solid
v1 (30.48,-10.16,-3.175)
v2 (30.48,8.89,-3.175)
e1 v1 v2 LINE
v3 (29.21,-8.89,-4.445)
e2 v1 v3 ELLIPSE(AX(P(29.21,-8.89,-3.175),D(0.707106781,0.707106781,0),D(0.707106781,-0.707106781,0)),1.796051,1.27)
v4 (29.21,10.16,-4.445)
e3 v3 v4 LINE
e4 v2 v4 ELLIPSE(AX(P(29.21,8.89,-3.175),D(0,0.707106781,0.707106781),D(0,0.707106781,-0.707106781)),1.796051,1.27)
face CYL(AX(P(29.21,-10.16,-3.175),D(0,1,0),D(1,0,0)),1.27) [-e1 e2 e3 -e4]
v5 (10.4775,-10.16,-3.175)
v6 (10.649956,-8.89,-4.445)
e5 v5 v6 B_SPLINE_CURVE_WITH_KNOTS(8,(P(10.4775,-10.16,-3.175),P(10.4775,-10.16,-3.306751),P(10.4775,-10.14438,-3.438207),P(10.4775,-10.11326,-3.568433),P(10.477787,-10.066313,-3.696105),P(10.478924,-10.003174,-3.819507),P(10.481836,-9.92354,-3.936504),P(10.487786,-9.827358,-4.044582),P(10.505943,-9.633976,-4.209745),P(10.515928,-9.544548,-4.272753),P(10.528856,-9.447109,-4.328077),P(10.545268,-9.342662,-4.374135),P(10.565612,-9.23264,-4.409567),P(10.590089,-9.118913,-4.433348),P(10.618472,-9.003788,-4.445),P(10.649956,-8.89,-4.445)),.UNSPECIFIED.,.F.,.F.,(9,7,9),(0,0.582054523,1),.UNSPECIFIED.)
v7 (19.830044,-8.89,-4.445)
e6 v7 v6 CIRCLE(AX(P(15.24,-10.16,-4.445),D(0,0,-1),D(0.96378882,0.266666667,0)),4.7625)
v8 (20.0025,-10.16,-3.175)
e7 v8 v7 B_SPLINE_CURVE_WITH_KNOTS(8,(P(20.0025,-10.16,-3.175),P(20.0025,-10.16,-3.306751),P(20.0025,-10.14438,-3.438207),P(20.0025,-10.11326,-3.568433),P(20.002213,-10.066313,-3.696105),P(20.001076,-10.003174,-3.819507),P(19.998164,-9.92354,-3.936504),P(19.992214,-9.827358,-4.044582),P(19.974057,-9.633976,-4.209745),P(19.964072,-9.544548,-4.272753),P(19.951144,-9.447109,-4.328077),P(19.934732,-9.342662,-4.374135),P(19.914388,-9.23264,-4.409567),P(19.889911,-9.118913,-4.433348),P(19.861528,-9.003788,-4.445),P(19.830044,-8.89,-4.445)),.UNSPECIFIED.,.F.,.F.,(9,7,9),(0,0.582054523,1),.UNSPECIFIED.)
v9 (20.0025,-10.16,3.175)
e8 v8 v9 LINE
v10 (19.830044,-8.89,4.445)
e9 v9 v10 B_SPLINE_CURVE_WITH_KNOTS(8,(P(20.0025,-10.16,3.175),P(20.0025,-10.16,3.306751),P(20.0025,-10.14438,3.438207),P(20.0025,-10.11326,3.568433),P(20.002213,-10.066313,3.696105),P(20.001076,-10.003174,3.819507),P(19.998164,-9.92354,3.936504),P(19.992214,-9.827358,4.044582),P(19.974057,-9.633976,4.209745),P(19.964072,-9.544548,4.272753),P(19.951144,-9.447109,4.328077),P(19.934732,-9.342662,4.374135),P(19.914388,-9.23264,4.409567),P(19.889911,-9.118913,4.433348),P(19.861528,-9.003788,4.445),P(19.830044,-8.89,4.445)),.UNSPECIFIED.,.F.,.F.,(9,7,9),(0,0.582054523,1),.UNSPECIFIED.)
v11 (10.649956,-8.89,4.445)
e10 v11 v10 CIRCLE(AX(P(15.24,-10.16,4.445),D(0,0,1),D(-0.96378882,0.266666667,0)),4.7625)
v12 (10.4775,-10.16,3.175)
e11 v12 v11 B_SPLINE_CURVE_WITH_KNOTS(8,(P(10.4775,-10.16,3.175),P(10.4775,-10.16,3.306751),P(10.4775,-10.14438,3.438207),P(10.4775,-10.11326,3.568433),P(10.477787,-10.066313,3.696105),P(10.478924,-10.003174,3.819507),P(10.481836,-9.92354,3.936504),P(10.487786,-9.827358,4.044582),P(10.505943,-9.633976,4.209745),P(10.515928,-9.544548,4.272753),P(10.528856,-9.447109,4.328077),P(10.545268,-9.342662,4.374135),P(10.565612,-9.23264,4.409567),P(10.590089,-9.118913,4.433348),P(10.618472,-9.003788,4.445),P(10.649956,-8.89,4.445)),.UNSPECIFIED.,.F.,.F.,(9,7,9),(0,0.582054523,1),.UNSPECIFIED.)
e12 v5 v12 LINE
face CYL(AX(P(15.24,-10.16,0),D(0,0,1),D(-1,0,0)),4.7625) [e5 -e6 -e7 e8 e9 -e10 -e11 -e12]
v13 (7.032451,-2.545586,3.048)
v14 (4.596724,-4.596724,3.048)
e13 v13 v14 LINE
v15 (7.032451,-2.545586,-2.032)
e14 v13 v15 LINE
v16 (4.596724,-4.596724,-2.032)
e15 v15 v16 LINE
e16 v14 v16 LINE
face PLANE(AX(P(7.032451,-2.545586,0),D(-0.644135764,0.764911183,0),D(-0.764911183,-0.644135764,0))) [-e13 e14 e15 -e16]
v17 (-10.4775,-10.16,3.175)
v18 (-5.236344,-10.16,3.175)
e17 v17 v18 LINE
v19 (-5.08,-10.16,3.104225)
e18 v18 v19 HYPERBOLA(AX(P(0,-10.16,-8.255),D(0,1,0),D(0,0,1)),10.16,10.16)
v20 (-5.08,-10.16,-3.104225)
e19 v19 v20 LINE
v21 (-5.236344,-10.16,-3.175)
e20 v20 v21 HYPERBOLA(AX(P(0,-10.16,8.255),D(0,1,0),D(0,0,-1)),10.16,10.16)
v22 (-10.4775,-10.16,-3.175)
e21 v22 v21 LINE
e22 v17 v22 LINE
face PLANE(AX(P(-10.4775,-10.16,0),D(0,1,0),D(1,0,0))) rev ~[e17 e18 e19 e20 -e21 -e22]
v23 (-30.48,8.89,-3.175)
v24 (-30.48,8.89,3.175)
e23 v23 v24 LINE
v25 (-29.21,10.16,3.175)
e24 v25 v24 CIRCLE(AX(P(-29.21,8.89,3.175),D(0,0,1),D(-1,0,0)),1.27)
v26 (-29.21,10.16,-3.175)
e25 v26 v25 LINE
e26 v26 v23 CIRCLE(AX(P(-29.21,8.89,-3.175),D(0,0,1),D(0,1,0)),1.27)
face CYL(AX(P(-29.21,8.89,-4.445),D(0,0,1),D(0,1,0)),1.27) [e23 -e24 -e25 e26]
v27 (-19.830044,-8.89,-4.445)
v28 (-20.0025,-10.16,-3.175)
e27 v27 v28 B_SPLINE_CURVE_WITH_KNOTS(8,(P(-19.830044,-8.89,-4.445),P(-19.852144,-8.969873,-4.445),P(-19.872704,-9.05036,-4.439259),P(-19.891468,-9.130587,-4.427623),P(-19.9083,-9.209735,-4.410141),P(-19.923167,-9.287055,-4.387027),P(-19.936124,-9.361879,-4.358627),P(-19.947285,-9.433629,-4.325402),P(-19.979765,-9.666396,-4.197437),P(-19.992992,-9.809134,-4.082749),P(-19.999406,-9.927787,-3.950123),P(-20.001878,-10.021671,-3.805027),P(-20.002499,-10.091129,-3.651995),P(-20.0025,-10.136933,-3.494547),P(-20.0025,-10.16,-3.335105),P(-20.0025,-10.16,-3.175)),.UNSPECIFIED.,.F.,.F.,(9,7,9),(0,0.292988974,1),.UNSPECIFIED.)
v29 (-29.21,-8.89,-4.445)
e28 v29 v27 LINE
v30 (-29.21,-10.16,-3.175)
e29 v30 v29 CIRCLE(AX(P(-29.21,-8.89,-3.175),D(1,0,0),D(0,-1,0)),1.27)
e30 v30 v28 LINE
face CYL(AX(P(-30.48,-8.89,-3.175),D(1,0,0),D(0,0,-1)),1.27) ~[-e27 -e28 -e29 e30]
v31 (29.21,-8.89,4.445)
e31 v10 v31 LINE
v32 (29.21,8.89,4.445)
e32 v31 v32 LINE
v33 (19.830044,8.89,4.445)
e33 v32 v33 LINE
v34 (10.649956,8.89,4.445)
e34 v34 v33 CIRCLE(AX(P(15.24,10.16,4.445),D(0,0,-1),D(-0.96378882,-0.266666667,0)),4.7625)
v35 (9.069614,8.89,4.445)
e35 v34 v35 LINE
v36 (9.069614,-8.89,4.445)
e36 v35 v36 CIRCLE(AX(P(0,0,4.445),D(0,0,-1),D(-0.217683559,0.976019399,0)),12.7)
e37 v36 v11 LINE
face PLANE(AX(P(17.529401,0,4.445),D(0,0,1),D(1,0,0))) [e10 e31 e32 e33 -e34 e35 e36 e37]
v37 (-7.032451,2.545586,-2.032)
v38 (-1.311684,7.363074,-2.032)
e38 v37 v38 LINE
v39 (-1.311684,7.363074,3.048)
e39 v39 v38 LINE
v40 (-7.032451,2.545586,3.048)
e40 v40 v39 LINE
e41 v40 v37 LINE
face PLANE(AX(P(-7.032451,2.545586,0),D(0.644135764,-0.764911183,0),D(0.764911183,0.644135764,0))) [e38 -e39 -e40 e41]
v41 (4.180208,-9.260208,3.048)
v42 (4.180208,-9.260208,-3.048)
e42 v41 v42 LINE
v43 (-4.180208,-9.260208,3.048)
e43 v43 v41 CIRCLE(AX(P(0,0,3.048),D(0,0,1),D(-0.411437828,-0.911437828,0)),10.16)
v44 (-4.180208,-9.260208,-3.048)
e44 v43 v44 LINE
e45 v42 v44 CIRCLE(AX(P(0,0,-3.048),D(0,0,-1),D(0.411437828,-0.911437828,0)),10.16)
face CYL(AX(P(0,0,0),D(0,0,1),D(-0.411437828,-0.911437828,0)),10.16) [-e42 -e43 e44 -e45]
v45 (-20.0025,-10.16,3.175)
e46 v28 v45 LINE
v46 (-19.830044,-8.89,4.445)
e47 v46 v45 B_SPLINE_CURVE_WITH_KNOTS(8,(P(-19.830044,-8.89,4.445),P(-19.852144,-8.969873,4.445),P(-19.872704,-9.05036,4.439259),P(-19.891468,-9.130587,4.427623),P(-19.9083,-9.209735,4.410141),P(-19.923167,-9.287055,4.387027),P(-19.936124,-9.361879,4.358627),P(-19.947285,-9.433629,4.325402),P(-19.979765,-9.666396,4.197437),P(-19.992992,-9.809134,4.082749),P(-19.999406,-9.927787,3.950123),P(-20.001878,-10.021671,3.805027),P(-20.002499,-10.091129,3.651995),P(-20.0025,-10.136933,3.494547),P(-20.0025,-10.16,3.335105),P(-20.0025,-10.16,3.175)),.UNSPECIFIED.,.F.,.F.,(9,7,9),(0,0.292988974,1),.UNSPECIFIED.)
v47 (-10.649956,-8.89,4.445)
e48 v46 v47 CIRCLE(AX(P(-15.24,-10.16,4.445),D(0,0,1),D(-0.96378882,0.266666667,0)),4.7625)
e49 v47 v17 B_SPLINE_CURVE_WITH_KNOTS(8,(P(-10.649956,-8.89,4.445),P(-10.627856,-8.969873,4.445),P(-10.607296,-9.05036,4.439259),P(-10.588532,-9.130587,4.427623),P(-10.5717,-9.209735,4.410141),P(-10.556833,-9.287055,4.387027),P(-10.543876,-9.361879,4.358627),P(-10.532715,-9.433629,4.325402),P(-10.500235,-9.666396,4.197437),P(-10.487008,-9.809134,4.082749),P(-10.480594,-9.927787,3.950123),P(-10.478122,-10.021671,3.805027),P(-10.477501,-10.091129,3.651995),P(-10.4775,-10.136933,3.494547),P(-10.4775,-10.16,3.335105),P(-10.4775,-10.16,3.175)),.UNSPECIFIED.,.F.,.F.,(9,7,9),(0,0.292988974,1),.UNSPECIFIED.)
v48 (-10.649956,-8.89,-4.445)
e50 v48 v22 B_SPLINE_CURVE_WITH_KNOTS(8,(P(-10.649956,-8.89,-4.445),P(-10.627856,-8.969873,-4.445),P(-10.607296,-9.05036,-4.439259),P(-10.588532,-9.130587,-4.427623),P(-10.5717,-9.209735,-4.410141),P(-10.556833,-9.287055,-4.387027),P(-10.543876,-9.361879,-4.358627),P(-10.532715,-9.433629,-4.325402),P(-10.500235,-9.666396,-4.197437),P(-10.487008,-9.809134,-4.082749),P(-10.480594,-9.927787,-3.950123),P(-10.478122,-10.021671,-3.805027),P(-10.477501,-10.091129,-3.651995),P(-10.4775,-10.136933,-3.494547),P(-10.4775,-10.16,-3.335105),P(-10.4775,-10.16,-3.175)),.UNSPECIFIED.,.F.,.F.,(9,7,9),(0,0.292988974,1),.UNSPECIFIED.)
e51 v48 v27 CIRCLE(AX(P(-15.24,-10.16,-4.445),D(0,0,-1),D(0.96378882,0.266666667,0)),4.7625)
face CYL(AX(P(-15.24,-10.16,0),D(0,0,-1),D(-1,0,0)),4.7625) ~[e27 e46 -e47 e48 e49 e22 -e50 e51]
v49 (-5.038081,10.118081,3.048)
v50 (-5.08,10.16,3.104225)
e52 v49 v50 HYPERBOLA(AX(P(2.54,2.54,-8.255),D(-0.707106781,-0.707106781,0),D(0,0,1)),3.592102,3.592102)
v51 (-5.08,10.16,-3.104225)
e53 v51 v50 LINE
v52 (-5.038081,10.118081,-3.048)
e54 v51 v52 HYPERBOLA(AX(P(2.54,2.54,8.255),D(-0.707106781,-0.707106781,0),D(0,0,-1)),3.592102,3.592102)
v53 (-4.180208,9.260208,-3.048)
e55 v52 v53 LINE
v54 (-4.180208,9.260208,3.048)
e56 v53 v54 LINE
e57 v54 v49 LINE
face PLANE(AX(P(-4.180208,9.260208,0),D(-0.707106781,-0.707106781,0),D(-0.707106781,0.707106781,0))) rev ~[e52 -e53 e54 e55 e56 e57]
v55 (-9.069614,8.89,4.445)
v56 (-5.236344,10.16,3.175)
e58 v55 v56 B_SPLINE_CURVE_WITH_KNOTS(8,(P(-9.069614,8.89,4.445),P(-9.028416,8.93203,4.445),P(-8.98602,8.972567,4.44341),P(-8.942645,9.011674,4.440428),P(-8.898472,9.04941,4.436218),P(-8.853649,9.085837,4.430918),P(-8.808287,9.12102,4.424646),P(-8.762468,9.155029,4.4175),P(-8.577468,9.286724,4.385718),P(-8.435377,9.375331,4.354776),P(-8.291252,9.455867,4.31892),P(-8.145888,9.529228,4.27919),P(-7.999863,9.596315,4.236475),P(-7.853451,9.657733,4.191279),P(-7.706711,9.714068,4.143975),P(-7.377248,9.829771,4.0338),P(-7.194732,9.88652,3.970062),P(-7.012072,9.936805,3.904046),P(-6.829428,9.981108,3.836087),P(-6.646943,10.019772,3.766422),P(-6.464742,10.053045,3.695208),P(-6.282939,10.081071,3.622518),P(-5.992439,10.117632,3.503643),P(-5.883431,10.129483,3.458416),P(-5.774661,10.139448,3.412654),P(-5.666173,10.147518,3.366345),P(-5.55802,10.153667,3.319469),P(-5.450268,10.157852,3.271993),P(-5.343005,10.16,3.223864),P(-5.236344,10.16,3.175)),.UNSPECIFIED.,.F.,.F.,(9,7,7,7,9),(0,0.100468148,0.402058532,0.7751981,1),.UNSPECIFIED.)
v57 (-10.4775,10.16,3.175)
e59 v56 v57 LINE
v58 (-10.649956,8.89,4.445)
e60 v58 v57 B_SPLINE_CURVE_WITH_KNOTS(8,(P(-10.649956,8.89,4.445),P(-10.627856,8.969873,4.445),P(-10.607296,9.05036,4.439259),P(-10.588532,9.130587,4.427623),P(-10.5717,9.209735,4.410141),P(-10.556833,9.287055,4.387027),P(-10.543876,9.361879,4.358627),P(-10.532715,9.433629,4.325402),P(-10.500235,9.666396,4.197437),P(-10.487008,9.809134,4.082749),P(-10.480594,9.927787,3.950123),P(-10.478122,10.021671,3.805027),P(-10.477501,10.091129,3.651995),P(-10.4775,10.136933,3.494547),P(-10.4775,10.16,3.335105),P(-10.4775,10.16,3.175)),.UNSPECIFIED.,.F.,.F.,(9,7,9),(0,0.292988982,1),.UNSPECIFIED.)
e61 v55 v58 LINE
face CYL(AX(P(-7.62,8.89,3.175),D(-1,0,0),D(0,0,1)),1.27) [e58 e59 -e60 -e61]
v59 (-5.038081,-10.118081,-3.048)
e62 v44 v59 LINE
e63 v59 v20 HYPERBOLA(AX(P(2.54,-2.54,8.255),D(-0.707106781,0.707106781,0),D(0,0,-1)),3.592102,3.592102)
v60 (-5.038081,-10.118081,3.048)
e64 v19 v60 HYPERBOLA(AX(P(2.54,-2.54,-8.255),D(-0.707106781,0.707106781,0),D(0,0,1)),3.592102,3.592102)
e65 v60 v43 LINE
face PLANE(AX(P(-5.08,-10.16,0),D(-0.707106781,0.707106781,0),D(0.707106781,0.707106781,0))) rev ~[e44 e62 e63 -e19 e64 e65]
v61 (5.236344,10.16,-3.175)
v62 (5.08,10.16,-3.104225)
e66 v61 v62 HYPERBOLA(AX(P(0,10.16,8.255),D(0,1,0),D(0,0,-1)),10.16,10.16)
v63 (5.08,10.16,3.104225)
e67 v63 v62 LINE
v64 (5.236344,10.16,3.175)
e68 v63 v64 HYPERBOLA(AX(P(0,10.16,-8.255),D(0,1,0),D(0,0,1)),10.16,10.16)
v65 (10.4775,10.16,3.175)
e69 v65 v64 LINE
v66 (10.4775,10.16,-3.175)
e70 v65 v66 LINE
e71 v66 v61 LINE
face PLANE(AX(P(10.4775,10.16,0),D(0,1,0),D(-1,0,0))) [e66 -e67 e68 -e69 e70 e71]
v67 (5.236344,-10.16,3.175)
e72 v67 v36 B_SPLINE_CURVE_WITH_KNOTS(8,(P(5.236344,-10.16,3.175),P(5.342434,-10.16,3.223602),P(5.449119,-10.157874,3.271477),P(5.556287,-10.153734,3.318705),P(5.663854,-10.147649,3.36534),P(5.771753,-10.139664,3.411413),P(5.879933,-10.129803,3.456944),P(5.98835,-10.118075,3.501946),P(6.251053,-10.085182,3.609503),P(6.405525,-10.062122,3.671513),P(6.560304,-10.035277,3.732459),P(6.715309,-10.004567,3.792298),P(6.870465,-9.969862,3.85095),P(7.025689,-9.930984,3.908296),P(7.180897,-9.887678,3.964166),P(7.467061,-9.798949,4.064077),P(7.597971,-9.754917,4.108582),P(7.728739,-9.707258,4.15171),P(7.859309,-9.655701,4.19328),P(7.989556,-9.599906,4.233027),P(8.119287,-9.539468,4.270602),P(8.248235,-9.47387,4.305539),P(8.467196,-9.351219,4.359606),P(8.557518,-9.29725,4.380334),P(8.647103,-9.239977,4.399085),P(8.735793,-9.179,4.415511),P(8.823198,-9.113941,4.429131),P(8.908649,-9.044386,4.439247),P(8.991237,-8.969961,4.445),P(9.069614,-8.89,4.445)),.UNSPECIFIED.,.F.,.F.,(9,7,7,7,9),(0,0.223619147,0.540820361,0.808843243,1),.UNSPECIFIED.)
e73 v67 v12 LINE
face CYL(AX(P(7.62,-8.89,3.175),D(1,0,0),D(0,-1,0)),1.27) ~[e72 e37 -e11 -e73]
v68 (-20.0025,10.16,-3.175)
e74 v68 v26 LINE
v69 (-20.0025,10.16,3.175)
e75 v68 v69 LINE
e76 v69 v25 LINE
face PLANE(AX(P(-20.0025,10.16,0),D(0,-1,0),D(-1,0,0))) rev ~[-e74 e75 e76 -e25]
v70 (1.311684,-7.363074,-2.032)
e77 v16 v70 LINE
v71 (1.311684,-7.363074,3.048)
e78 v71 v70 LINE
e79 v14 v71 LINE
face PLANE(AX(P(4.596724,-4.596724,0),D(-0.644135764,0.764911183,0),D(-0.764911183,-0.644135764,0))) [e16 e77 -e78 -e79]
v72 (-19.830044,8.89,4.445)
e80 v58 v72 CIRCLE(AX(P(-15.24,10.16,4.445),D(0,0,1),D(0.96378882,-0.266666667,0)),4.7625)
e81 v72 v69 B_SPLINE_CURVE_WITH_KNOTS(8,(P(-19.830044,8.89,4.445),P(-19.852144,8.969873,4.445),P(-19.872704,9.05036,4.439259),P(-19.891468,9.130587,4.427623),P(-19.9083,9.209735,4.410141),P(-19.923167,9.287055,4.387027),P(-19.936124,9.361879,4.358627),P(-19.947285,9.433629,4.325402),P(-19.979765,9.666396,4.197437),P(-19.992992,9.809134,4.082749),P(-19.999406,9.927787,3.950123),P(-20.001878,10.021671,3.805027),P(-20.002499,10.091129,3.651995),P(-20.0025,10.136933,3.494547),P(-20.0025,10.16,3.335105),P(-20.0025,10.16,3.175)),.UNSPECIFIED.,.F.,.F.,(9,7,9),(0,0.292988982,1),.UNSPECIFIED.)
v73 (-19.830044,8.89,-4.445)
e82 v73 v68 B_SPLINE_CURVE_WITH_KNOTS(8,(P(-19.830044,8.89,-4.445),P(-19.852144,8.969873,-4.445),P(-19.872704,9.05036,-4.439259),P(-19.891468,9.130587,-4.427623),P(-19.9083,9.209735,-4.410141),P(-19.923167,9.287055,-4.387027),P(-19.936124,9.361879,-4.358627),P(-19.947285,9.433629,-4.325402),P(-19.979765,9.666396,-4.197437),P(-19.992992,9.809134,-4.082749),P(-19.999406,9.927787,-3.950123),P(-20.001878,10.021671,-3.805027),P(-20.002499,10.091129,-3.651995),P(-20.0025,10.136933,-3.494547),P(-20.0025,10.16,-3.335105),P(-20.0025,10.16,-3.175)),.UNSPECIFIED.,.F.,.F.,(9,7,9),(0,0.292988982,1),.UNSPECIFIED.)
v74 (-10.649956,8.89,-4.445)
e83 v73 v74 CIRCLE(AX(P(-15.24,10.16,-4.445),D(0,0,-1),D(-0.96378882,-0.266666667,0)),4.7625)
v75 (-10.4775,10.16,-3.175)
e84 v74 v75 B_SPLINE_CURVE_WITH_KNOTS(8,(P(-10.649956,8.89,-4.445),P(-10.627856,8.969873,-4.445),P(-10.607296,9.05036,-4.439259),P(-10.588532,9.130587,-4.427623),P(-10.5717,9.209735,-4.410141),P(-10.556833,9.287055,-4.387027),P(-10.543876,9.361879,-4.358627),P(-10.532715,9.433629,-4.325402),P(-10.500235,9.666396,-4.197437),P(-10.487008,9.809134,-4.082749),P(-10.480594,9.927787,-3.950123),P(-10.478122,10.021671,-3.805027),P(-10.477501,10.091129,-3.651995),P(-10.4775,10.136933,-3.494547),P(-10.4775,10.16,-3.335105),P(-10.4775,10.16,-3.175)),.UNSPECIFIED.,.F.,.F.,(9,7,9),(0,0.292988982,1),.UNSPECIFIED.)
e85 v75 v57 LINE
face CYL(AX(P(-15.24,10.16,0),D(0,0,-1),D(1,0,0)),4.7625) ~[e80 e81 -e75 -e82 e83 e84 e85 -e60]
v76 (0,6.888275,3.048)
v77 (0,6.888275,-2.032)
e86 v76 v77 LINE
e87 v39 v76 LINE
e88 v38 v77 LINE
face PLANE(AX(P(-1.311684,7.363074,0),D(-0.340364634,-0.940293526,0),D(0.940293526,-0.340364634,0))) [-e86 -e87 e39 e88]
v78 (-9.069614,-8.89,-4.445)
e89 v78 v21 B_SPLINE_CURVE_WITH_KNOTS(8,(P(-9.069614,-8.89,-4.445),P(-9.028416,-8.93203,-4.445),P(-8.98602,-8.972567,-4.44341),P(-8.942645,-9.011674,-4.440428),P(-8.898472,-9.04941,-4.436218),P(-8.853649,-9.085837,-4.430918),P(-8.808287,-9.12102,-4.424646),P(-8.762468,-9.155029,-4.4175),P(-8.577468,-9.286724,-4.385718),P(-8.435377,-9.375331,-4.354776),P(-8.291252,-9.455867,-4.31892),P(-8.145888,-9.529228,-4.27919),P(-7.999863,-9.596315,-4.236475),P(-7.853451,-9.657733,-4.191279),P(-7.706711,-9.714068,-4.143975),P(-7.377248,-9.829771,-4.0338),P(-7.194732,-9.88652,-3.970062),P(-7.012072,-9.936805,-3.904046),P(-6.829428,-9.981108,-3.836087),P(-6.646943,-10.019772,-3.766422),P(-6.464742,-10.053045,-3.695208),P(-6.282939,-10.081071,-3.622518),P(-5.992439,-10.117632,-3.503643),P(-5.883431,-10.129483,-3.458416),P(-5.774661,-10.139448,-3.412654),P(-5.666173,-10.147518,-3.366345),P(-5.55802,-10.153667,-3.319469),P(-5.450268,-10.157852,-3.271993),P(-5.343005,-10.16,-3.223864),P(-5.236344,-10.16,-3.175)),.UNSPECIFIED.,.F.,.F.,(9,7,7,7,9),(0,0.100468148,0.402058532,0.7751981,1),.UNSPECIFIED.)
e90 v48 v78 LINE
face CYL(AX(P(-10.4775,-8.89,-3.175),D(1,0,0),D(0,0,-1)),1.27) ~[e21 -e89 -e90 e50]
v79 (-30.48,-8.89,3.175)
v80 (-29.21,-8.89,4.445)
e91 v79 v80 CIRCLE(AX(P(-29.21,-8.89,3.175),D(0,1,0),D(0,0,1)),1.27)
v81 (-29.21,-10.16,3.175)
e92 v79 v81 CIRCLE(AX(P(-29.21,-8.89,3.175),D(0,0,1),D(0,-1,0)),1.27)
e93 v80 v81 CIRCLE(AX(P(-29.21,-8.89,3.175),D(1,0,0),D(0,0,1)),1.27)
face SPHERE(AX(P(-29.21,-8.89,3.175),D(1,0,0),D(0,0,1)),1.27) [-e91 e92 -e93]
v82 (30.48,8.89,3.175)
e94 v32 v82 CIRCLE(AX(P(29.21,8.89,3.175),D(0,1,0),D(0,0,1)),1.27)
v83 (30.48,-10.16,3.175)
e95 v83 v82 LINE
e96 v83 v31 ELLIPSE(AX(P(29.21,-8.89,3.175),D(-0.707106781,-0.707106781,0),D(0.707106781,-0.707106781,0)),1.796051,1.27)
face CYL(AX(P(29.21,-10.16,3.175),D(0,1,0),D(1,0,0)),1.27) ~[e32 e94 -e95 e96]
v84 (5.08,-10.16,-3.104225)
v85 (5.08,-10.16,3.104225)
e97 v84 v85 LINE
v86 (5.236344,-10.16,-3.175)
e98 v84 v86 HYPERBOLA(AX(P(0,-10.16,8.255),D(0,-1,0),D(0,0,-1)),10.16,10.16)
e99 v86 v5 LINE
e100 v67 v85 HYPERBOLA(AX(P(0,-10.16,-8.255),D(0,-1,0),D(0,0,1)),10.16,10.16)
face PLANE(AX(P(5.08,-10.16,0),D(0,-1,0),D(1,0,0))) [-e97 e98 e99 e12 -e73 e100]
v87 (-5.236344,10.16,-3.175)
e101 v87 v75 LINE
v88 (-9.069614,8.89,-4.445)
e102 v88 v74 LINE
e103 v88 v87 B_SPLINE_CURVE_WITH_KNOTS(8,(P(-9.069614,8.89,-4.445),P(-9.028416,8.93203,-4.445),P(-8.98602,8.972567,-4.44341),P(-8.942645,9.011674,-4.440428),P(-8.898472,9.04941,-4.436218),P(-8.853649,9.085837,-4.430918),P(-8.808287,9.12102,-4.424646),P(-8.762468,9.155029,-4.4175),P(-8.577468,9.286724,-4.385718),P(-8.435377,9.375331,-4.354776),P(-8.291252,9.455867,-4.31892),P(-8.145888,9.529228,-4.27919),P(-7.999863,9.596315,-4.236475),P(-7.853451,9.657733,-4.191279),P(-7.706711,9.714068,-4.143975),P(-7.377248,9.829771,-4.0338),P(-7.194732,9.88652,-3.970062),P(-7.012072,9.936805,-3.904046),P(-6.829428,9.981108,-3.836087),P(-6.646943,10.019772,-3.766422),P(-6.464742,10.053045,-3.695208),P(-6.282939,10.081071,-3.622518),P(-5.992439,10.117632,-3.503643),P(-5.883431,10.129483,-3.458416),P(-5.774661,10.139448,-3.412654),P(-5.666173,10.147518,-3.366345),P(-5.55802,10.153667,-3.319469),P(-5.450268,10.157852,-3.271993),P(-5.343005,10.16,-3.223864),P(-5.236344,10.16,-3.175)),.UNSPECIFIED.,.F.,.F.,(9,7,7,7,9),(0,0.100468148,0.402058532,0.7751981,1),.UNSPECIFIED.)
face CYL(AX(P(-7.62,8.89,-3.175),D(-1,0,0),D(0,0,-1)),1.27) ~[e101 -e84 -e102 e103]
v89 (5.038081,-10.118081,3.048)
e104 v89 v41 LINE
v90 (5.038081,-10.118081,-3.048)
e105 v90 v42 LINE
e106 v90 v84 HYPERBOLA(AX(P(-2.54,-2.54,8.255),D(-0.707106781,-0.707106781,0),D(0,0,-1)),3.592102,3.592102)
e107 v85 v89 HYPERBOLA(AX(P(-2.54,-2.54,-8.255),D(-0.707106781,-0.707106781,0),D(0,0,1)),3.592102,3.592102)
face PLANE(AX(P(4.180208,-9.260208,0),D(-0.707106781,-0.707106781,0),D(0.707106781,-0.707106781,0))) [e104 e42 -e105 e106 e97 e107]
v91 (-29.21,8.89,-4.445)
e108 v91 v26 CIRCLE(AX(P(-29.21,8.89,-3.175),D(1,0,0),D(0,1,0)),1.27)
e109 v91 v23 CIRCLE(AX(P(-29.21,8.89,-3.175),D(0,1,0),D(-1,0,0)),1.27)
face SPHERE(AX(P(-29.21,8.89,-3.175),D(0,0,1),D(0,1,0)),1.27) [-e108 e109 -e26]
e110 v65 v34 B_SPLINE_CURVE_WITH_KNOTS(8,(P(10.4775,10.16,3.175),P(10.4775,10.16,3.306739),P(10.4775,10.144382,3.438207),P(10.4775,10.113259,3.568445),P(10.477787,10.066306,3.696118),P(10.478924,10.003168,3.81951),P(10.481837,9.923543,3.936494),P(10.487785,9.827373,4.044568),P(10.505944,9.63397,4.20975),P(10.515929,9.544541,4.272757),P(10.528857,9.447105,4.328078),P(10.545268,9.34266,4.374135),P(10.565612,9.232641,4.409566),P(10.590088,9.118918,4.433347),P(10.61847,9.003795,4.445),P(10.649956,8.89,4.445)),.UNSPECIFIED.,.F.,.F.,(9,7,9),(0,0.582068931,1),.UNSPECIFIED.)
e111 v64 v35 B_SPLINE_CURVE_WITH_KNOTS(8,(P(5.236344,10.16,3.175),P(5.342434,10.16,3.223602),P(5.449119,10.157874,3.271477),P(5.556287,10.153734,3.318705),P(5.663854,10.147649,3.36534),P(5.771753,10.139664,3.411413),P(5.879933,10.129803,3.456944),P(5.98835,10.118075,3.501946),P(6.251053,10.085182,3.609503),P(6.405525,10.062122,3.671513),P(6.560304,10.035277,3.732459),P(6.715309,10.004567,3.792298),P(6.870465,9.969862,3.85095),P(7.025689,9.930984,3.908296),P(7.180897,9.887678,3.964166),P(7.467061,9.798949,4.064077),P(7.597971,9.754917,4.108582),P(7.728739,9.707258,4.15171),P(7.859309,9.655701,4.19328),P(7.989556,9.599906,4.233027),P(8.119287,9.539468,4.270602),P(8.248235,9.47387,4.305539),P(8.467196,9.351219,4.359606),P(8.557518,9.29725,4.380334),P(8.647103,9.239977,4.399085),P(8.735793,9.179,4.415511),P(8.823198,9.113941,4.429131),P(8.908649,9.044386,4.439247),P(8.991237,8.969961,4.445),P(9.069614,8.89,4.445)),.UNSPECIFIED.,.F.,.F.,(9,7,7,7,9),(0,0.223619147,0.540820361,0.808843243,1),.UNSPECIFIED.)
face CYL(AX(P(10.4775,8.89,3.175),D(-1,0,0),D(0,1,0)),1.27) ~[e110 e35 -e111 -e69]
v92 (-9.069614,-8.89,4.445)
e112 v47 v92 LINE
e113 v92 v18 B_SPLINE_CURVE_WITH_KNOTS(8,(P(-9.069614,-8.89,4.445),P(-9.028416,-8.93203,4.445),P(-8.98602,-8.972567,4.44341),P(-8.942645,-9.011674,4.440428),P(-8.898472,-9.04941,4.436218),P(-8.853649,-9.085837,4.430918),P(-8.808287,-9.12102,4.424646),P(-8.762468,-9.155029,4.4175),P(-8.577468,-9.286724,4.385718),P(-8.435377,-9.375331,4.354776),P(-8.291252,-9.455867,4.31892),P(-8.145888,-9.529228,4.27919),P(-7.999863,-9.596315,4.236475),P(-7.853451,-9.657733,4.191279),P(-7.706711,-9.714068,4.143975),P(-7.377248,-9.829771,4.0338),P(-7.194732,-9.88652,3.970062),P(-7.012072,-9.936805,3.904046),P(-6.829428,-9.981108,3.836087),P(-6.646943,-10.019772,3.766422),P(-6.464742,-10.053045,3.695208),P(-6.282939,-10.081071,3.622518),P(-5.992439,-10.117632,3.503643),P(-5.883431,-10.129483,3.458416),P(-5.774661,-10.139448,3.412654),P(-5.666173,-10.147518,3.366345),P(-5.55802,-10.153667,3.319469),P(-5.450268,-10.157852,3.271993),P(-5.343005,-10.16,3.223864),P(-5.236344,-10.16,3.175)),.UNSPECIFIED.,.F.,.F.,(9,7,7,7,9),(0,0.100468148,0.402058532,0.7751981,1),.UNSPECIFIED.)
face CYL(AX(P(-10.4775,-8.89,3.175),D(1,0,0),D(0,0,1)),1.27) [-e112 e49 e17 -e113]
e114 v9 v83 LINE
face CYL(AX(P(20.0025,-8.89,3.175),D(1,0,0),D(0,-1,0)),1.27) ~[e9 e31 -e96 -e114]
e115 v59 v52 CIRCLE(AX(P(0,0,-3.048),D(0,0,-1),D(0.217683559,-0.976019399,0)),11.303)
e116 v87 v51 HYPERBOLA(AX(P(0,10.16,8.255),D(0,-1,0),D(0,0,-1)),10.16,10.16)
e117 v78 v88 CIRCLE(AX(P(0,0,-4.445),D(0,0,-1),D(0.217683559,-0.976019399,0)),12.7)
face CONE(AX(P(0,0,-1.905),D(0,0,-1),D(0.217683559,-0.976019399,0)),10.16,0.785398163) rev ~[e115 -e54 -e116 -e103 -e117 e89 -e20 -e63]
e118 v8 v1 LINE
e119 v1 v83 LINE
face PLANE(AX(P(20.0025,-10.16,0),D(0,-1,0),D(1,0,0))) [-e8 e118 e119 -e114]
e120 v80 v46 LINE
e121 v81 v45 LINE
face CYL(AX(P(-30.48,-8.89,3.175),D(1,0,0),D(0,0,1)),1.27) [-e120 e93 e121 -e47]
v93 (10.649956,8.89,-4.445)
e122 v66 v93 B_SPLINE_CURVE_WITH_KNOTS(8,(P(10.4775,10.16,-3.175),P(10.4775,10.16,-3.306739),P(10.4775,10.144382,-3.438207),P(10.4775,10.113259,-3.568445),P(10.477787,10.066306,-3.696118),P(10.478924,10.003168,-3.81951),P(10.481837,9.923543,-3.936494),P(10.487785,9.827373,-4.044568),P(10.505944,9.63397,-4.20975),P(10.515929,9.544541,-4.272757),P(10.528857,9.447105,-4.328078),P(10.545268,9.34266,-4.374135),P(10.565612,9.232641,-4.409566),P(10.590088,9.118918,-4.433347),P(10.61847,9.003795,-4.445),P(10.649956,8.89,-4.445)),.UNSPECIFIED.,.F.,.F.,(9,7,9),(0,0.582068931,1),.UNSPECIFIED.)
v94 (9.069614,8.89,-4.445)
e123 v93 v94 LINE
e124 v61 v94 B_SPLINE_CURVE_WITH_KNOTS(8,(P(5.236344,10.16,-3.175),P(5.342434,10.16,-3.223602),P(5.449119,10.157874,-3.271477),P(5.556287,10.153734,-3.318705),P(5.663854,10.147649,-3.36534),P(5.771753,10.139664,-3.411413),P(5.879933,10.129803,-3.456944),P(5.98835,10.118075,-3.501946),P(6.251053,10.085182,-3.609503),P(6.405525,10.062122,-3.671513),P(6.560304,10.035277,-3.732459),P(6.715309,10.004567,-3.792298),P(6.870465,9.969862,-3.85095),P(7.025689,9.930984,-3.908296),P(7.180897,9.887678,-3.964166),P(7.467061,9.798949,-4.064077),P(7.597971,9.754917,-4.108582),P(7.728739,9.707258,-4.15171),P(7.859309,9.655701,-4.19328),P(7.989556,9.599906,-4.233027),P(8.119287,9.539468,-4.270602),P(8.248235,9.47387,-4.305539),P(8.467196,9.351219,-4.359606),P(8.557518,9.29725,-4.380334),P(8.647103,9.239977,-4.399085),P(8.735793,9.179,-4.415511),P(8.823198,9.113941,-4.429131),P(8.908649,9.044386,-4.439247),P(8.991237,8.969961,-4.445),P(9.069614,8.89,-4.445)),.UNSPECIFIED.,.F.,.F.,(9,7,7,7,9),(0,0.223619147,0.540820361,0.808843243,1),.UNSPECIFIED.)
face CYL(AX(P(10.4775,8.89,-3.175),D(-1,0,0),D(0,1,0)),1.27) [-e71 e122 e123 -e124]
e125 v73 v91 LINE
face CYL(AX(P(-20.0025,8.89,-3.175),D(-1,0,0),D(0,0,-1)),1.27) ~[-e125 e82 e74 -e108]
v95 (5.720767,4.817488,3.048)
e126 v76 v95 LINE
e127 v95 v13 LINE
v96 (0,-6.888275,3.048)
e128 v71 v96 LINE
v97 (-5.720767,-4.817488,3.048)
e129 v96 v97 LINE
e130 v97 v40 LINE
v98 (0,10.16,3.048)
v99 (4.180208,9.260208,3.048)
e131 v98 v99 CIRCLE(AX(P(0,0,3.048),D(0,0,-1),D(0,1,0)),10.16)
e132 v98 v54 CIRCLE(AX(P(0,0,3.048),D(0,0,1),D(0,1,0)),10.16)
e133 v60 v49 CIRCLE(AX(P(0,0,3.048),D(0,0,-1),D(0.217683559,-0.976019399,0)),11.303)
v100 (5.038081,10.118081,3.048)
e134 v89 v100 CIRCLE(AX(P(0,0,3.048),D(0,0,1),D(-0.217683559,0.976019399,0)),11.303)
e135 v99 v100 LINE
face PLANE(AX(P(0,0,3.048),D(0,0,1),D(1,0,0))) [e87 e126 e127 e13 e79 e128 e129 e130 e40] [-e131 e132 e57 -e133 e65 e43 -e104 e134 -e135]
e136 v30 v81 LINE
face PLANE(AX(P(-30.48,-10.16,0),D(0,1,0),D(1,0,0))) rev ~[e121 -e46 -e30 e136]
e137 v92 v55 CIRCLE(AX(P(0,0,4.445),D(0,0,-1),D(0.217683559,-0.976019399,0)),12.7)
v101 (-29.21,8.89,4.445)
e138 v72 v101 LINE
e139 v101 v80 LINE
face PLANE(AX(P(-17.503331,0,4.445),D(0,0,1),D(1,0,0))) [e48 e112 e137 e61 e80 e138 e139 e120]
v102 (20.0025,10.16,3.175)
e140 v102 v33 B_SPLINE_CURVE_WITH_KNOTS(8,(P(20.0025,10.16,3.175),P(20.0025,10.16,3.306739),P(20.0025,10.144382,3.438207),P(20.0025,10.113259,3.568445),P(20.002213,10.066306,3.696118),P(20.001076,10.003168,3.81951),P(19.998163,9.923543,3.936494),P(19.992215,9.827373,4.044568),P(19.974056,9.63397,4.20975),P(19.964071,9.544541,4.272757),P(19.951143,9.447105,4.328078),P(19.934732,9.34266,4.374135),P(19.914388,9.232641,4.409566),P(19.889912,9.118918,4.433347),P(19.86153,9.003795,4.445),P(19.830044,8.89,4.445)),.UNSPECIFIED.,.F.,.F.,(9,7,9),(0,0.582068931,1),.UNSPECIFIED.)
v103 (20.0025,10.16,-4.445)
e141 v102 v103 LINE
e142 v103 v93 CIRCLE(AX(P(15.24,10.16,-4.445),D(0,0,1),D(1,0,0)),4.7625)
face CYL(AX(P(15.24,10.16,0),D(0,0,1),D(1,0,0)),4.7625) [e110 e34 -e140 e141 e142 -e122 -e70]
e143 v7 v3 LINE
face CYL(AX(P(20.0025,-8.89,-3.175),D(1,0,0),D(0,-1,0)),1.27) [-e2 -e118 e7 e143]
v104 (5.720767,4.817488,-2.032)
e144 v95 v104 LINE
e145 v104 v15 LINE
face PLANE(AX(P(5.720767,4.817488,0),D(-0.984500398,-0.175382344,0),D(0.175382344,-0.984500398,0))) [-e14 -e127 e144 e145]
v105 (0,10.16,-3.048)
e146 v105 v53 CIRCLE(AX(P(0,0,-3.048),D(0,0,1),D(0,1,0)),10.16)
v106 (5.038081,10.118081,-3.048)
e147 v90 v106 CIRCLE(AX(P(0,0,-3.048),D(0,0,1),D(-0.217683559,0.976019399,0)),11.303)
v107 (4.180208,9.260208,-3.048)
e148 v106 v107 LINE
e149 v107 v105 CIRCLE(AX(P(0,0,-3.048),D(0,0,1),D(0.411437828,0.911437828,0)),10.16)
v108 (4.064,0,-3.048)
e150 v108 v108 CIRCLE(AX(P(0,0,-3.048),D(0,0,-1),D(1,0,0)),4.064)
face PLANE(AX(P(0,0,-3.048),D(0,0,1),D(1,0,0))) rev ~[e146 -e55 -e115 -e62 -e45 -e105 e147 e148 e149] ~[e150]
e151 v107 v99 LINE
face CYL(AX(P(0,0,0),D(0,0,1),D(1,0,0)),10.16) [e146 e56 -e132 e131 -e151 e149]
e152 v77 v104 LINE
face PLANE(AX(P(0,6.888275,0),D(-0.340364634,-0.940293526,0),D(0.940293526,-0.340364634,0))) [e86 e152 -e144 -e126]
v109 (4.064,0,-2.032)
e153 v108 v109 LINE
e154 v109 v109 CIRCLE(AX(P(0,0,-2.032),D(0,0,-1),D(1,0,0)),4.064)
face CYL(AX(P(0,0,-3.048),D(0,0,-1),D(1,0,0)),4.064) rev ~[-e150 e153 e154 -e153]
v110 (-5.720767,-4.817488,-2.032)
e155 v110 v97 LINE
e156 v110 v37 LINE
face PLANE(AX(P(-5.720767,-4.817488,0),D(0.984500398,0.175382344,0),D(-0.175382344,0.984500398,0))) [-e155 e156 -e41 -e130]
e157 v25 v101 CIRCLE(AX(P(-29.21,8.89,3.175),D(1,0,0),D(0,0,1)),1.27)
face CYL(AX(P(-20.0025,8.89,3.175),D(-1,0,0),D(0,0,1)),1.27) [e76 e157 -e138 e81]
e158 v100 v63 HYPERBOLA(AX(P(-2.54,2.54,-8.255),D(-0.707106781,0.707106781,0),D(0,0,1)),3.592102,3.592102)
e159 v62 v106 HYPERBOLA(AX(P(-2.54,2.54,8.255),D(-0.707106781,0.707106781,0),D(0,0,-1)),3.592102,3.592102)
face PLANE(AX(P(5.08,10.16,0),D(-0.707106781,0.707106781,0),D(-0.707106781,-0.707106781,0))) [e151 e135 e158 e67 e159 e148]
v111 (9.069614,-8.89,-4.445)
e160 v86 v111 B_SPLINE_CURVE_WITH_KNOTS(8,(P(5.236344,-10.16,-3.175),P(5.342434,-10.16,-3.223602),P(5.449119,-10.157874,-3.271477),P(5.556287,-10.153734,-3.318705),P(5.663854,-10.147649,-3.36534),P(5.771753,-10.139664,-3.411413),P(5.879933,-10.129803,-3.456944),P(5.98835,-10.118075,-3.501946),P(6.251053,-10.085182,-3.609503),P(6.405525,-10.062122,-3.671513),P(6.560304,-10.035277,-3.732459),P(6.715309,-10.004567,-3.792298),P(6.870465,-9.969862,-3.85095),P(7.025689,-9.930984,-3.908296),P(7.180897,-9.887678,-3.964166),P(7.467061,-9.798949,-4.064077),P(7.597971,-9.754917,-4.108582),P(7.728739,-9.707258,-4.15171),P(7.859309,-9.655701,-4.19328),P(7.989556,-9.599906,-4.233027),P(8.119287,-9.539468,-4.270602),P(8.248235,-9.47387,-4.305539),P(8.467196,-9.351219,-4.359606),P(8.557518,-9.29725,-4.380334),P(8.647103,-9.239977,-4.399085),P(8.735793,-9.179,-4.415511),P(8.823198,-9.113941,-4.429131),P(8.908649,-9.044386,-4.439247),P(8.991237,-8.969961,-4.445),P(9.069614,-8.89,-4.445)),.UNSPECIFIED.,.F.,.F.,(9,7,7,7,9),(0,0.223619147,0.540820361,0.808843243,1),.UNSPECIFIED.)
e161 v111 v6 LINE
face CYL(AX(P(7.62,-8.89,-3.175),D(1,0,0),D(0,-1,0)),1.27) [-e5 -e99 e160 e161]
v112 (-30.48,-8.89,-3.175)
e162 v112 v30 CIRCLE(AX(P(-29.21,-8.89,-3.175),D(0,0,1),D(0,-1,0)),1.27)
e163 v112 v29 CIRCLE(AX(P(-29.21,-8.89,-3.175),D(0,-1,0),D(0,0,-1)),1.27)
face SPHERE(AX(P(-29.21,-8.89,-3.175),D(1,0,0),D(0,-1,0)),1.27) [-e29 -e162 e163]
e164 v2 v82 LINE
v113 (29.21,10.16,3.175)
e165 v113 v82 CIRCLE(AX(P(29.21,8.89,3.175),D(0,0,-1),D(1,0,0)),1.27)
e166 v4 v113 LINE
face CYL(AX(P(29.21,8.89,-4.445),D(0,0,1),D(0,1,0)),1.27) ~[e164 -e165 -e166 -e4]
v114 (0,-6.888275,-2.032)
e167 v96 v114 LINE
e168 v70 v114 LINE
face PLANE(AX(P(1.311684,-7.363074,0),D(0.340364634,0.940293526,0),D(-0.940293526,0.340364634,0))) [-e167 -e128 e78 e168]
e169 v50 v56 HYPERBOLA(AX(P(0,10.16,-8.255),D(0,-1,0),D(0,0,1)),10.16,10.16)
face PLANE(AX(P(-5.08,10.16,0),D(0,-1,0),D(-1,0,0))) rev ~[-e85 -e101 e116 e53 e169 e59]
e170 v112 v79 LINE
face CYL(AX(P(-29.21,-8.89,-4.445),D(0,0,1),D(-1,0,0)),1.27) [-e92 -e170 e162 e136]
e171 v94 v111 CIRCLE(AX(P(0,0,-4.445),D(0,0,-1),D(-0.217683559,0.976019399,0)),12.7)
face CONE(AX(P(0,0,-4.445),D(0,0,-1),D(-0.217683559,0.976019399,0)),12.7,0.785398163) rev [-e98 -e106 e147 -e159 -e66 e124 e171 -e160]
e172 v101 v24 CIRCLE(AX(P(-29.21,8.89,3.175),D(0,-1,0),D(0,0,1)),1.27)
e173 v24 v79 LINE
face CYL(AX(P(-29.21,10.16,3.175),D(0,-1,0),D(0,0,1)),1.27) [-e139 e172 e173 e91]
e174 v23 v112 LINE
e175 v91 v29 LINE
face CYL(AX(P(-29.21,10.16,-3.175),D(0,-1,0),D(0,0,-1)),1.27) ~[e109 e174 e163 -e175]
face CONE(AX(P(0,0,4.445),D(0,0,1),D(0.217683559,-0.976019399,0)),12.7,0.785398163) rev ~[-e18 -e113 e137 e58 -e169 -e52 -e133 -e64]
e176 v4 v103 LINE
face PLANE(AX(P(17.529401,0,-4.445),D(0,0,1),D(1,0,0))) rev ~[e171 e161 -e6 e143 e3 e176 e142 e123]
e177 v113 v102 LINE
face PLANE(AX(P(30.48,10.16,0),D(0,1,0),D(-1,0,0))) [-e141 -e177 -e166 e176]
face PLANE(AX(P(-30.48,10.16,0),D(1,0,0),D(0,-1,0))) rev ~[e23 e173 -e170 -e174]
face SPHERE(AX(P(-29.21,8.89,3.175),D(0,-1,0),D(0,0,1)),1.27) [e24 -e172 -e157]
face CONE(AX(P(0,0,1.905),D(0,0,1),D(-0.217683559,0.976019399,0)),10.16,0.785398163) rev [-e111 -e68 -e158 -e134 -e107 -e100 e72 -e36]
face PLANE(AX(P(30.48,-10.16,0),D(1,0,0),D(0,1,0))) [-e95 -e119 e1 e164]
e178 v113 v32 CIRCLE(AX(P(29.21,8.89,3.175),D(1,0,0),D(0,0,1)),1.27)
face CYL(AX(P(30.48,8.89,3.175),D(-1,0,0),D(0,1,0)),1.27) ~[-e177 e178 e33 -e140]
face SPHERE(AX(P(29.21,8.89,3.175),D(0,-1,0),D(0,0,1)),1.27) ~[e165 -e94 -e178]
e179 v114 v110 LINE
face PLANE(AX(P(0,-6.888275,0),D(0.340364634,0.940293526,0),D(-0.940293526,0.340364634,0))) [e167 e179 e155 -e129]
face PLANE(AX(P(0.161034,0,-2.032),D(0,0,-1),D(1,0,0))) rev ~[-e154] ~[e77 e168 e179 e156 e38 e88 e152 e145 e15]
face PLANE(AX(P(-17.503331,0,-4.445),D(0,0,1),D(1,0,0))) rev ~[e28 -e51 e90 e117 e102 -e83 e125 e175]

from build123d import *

# Parameters (mm, degrees)
F1_DEPTH     = 3.048
F2_DEPTH     = 4.445
F3_T4_ANGLE  = 205.1460272103
F3_T9_ANGLE  = 205.1460272103
F3_T14_ANGLE = 205.1460272103
F3_T19_ANGLE = 205.1460272103
F4_R         = 1.27
F5_R         = 4.064
F6_DEPTH     = 1.016


# Not quite as in the source:
# - a fillet or chamfer that OpenCascade refuses, or shapes differently, is made with other operations: its cross-section is extruded or revolved along the edge and cut away or added


with BuildPart() as f1:
    # F0 (on Top) → F1 (new body, symmetric)
    with BuildSketch(Plane.XY):
        with BuildLine():
            ThreePointArc((4.1802083301, 9.2602083301), (2.1379760717, 9.932505138), (0, 10.16))
            ThreePointArc((0, 10.16), (-2.1379760717, 9.932505138), (-4.1802083301, 9.2602083301))
            ThreePointArc((-4.1802083301, 9.2602083301), (-10.16, 0), (-4.1802083301, -9.2602083301))
            ThreePointArc((-4.1802083301, -9.2602083301), (0, -10.16), (4.1802083301, -9.2602083301))
            ThreePointArc((4.1802083301, -9.2602083301), (8.5351191156, -5.511564359), (10.16, 0))
            ThreePointArc((10.16, 0), (8.5351191156, 5.511564359), (4.1802083301, 9.2602083301))
        make_face()
        Polygon((-5.7207672085, -4.8174884064), (-7.0324509466, 2.5455855286), (-1.3116837381, 7.3630739349), (0, 6.8882745845), (5.7207672085, 4.8174884064), (7.0324509466, -2.5455855286), (4.5967240587, -4.5967240587), (1.3116837381, -7.3630739349), (0, -6.8882745845), align=None, mode=Mode.SUBTRACT)
    extrude(amount=F1_DEPTH, both=True)

    # F0 (on Top) → F2 (join, symmetric)
    with BuildSketch(Plane.XY):
        with BuildLine():
            ThreePointArc((-4.1802083301, -9.2602083301), (-10.16, 0), (-4.1802083301, 9.2602083301))
            Line((-4.1802083301, 9.2602083301), (-5.08, 10.16))
            Line((-5.08, 10.16), (-10.4775, 10.16))
            ThreePointArc((-10.4775, 10.16), (-15.24, 14.9225), (-20.0025, 10.16))
            Line((-20.0025, 10.16), (-30.48, 10.16))
            Line((-30.48, 10.16), (-30.48, -10.16))
            Line((-30.48, -10.16), (-20.0025, -10.16))
            ThreePointArc((-20.0025, -10.16), (-15.24, -14.9225), (-10.4775, -10.16))
            Line((-10.4775, -10.16), (-5.08, -10.16))
            Line((-5.08, -10.16), (-4.1802083301, -9.2602083301))
        make_face()
        with BuildLine():
            Line((5.08, 10.16), (4.1802083301, 9.2602083301))
            ThreePointArc((4.1802083301, 9.2602083301), (8.5351191156, 5.511564359), (10.16, 0))
            ThreePointArc((10.16, 0), (8.5351191156, -5.511564359), (4.1802083301, -9.2602083301))
            Line((4.1802083301, -9.2602083301), (5.08, -10.16))
            Line((5.08, -10.16), (10.4775, -10.16))
            ThreePointArc((10.4775, -10.16), (15.24, -14.9225), (20.0025, -10.16))
            Line((20.0025, -10.16), (30.48, -10.16))
            Line((30.48, -10.16), (30.48, 10.16))
            Line((30.48, 10.16), (20.0025, 10.16))
            ThreePointArc((20.0025, 10.16), (15.24, 14.9225), (10.4775, 10.16))
            Line((10.4775, 10.16), (5.08, 10.16))
        make_face()
    extrude(amount=F2_DEPTH, both=True)

    # F3: chamfer of 2.54 on 4 edges, made by hand


with BuildPart() as f3_tool2:
    # F3_s3 → F3_t4 (revolve)
    with BuildSketch(Plane(origin=(0, 0, 0), x_dir=(0, 0, 1), z_dir=(0.9760193995, 0.217683559, 0))):
        Polygon((4.445, 12.7), (1.905, 10.16), (4.445, 10.16), align=None)
    revolve(axis=Axis((0, 0, 4.445), (0, 0, -1)), revolution_arc=F3_T4_ANGLE)

    split(bisect_by=Plane.XY.offset(3.048), keep=Keep.TOP)


with BuildPart() as f1_1:
    add(f1.part)

    # F3_t1: cut F3_tool2
    add(f3_tool2.part, mode=Mode.SUBTRACT)


with BuildPart() as f3_tool7:
    # F3_s8 → F3_t9 (revolve)
    with BuildSketch(Plane(origin=(0, 0, 0), x_dir=(0, 0, 1), z_dir=(-0.9760193995, -0.217683559, 0))):
        Polygon((1.905, 10.16), (4.445, 12.7), (4.445, 10.16), align=None)
    revolve(axis=Axis((0, 0, 4.445), (0, 0, -1)), revolution_arc=F3_T9_ANGLE)

    split(bisect_by=Plane.XY.offset(3.048), keep=Keep.TOP)


with BuildPart() as f1_2:
    add(f1_1.part)

    # F3_t6: cut F3_tool7
    add(f3_tool7.part, mode=Mode.SUBTRACT)


with BuildPart() as f3_tool12:
    # F3_s13 → F3_t14 (revolve)
    with BuildSketch(Plane(origin=(0, 0, 0), x_dir=(0, 0, 1), z_dir=(-0.9760193995, -0.217683559, 0))):
        Polygon((-4.445, 12.7), (-1.905, 10.16), (-4.445, 10.16), align=None)
    revolve(axis=Axis((0, 0, -4.445), (0, 0, -1)), revolution_arc=F3_T14_ANGLE)

    split(bisect_by=Plane.XY.offset(-3.048), keep=Keep.BOTTOM)


with BuildPart() as f1_3:
    add(f1_2.part)

    # F3_t11: cut F3_tool12
    add(f3_tool12.part, mode=Mode.SUBTRACT)


with BuildPart() as f3_tool17:
    # F3_s18 → F3_t19 (revolve)
    with BuildSketch(Plane(origin=(0, 0, 0), x_dir=(0, 0, 1), z_dir=(0.9760193995, 0.217683559, 0))):
        Polygon((-1.905, 10.16), (-4.445, 12.7), (-4.445, 10.16), align=None)
    revolve(axis=Axis((0, 0, -4.445), (0, 0, -1)), revolution_arc=F3_T19_ANGLE)

    split(bisect_by=Plane.XY.offset(-3.048), keep=Keep.BOTTOM)


with BuildPart() as f1_4:
    add(f1_3.part)

    # F3_t16: cut F3_tool17
    add(f3_tool17.part, mode=Mode.SUBTRACT)

    # F4
    f4_edges = [f1_4.edges().sort_by_distance(p)[0] for p in [
        (-25.24125, -10.16, 4.445),
        (-30.48, 0, 4.445),
        (-25.24125, 10.16, 4.445),
        (25.24125, -10.16, 4.445),
        (30.48, 0, 4.445),
        (25.24125, 10.16, 4.445),
        (-25.24125, -10.16, -4.445),
        (-30.48, -10.16, 0),
        (25.24125, -10.16, -4.445),
        (30.48, 0, -4.445),
        (30.48, 10.16, 0),
        (-30.48, 10.16, 0),
        (-25.24125, 10.16, -4.445),
        (-30.48, 0, -4.445),
        (-9.04875, 10.16, 4.445),
        (9.04875, 10.16, 4.445),
        (-9.04875, -10.16, 4.445),
        (9.04875, -10.16, 4.445),
        (9.04875, 10.16, -4.445),
        (-9.04875, 10.16, -4.445),
        (-9.04875, -10.16, -4.445),
        (9.04875, -10.16, -4.445),
    ]]
    fillet(f4_edges, radius=F4_R)

    # F5 (on face) → F6 (join)
    with BuildSketch(Plane(origin=(0, 0, -3.048), x_dir=(1, 0, 0), z_dir=(0, 0, -1))):
        with BuildLine():
            ThreePointArc((4.4189755144, -9.4989755144), (8.8332738002, -5.6330413093), (10.4765395251, 0))
            ThreePointArc((10.4765395251, 0), (8.8332738002, 5.6330413093), (4.4189755144, 9.4989755144))
            Line((4.4189755144, 9.4989755144), (4.1802083301, 9.2602083301))
            ThreePointArc((4.1802083301, 9.2602083301), (0, 10.16), (-4.1802083301, 9.2602083301))
            Line((-4.1802083301, 9.2602083301), (-4.4189755144, 9.4989755144))
            ThreePointArc((-4.4189755144, 9.4989755144), (-10.4765395251, 0), (-4.4189755144, -9.4989755144))
            Line((-4.4189755144, -9.4989755144), (-4.1802083301, -9.2602083301))
            ThreePointArc((-4.1802083301, -9.2602083301), (0, -10.16), (4.1802083301, -9.2602083301))
            Line((4.1802083301, -9.2602083301), (4.4189755144, -9.4989755144))
        make_face()
        Polygon((-1.3116837381, -7.3630739349), (-7.0324509466, -2.5455855286), (-5.7207672085, 4.8174884064), (1.3116837381, 7.3630739349), (7.0324509466, 2.5455855286), (5.7207672085, -4.8174884064), align=None, mode=Mode.SUBTRACT)
        Polygon((-5.7207672085, 4.8174884064), (-7.0324509466, -2.5455855286), (-1.3116837381, -7.3630739349), (5.7207672085, -4.8174884064), (7.0324509466, 2.5455855286), (1.3116837381, 7.3630739349), align=None)
        Circle(F5_R, mode=Mode.SUBTRACT)
    extrude(amount=-F6_DEPTH)


solid = f1_4.part
